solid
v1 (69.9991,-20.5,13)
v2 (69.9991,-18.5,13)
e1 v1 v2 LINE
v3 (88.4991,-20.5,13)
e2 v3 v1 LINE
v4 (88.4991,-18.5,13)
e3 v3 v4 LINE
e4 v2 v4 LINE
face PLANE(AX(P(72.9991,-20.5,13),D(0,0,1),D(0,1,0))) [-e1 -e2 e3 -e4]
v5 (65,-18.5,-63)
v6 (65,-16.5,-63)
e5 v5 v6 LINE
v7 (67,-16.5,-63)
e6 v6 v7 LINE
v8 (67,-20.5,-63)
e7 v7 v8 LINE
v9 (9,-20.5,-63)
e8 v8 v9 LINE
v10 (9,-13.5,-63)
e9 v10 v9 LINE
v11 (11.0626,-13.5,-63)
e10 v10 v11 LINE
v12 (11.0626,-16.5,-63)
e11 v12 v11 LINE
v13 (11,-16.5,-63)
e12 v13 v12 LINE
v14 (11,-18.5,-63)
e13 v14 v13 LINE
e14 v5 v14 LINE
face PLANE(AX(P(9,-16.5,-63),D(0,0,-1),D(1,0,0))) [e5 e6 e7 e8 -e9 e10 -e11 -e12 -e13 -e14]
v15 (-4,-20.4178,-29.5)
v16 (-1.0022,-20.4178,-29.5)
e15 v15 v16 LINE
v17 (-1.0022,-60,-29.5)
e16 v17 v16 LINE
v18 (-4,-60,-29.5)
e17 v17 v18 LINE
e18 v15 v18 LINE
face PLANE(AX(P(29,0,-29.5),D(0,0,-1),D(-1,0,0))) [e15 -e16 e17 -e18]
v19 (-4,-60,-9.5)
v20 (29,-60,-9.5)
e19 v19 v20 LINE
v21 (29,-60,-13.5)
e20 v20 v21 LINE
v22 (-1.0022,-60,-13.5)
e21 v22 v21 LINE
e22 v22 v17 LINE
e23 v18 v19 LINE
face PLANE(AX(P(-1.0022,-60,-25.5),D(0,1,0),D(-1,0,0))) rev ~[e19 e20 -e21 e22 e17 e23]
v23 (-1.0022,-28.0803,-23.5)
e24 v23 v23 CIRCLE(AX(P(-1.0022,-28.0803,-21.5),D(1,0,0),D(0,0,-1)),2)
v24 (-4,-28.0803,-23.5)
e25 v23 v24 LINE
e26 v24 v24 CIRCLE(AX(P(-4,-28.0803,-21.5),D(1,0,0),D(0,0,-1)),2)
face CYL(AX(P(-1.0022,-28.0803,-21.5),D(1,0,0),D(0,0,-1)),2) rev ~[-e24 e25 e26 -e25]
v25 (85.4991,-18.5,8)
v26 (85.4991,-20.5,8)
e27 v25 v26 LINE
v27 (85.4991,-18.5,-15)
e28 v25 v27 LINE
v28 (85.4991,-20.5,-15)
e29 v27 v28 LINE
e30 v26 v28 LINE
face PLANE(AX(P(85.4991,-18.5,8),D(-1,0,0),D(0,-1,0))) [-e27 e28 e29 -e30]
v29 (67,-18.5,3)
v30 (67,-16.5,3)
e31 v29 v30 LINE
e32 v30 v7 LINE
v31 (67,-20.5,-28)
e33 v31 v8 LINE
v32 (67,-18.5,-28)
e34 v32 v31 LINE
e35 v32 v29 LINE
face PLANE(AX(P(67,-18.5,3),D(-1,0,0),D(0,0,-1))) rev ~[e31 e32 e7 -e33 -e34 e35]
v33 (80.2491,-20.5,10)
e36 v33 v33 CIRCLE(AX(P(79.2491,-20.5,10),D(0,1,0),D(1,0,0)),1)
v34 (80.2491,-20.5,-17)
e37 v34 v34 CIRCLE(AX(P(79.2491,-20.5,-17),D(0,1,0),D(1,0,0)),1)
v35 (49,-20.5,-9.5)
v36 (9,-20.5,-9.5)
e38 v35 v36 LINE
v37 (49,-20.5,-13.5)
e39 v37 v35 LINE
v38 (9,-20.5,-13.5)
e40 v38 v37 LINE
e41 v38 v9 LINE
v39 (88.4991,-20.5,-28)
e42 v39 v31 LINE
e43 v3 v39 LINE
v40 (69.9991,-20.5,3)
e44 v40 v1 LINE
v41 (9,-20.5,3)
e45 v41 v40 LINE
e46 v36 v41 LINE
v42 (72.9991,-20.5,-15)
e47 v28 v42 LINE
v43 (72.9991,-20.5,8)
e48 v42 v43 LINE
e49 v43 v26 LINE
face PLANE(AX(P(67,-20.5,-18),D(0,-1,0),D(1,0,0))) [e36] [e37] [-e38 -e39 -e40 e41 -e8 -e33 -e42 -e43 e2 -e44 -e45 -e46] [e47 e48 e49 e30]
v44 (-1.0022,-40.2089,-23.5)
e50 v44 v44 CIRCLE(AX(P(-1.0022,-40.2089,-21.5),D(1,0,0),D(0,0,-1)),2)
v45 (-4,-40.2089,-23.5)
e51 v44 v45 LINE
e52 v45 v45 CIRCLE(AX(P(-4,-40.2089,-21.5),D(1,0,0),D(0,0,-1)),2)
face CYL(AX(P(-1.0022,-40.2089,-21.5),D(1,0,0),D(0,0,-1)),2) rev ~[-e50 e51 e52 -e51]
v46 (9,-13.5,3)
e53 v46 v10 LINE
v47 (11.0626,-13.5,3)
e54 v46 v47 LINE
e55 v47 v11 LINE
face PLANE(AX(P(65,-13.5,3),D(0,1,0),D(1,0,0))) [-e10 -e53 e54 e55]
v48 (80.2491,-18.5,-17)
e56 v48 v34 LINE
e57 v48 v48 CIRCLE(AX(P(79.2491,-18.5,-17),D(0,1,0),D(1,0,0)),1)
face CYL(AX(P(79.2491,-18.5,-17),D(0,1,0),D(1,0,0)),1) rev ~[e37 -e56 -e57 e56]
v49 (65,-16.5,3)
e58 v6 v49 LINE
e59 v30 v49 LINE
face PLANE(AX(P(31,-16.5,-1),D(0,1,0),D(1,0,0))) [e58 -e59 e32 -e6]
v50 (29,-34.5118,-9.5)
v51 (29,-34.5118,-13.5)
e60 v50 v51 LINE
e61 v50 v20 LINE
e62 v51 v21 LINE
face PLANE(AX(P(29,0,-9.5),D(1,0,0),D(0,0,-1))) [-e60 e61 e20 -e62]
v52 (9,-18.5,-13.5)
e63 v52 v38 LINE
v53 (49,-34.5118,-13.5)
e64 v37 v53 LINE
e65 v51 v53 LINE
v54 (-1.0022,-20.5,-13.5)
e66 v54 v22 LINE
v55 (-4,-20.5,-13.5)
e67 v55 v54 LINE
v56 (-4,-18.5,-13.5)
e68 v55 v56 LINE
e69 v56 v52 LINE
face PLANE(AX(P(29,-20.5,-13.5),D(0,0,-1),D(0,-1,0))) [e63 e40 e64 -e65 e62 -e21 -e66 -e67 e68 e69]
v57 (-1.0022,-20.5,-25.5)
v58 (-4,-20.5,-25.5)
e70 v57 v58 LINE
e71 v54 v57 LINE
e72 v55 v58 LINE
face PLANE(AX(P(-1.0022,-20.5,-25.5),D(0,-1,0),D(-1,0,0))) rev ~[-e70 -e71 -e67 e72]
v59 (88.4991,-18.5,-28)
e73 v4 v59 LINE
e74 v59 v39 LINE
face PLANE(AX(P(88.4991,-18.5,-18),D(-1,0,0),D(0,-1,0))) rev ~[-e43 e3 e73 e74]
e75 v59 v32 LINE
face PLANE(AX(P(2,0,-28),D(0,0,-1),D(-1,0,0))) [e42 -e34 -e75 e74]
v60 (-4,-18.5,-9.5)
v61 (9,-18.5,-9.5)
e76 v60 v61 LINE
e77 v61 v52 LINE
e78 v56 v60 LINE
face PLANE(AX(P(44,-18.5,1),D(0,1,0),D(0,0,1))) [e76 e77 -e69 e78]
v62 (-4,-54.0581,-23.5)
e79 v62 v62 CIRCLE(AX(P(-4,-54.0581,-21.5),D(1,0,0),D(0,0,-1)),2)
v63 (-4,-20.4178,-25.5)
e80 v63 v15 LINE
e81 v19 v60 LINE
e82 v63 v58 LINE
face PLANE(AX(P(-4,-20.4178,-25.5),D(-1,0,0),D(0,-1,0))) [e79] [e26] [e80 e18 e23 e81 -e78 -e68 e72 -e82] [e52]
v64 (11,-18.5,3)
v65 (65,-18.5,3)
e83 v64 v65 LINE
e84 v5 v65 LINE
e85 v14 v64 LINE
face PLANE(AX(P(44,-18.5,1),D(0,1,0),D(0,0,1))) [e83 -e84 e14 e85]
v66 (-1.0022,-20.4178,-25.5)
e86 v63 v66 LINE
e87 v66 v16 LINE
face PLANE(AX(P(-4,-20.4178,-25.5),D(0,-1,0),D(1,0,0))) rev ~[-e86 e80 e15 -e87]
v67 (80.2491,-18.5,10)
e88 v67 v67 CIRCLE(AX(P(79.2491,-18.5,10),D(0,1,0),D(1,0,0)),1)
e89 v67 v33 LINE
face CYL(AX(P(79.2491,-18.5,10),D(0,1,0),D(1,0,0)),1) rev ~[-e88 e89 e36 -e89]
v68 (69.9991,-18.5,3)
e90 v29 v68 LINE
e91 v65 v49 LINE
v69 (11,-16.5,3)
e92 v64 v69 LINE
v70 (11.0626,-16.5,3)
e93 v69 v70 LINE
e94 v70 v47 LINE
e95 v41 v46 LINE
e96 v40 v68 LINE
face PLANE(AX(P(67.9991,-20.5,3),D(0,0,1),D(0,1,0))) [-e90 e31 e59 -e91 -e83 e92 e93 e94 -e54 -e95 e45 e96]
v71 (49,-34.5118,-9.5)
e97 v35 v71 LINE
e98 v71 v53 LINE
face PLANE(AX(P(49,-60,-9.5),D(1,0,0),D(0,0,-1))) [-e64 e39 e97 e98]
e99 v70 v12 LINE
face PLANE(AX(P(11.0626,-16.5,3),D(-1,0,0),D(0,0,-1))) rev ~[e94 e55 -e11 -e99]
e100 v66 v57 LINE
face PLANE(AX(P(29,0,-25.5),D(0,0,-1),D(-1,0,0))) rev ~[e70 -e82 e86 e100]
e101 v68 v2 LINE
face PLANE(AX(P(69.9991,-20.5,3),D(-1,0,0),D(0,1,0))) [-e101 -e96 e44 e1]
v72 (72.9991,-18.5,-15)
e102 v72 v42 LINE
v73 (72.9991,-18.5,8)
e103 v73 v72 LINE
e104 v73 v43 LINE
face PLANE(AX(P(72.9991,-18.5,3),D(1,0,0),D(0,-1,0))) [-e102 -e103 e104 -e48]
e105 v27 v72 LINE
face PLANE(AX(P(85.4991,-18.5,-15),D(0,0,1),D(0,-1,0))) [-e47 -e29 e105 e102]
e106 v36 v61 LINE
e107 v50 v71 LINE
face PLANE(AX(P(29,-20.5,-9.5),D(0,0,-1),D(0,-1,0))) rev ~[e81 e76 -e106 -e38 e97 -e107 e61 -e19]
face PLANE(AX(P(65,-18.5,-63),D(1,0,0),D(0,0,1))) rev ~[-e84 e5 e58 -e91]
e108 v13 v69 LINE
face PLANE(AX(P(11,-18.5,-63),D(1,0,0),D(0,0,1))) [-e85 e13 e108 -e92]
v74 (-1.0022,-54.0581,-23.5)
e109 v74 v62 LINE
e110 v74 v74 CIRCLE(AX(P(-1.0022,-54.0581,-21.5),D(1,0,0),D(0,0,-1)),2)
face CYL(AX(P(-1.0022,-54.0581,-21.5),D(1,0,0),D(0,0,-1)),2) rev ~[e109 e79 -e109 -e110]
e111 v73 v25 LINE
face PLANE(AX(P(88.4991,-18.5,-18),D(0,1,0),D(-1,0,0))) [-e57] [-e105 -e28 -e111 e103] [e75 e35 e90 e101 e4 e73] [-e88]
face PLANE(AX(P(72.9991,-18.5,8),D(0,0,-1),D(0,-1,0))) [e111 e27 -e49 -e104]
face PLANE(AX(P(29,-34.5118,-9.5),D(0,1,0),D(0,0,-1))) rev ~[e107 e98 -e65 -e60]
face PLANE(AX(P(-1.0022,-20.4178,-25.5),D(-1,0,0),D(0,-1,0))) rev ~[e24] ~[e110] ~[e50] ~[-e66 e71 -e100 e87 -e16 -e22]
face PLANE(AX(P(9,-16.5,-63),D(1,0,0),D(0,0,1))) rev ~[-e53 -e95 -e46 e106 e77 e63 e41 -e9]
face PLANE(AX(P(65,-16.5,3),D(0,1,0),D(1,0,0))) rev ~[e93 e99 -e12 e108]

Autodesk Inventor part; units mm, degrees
ref_plane "YZ Plane" through (0, 0, 0) normal (1, 0, 0) x (0, 1, 0)
ref_plane "XZ Plane" through (0, 0, 0) normal (0, 1, 0) x (-1, 0, 0)
ref_plane "XY Plane" through (0, 0, 0) normal (0, 0, 1) x (1, 0, 0)
sketch "Sketch1" plane through (0, 0, 0) normal (1, 0, 0) x (0, 1, 0)
  line L0 (0, 0) -> (20.5296, 0)
  line L1 (20.5296, -23) -> (0, -23)
  line L2 (0, -23) -> (0, 0)
  line L3 (0, 0) -> (50, 0)
  line L4 (50, 0) -> (50, -23)
  line L5 (50, -23) -> (0, -23)
  line L6 (0, -23) -> (0, 0)
  dimension "d0" = 23
  dimension "d1" = 50
extrude "Extrusion1" add sketch "Sketch1" along normal blind 2
sketch "Sketch2" plane through (2, 0, 0) normal (1, 0, 0) x (0, 0, -1)
  line L0 (23, 50) -> (0, 50) projected
  line L1 (13.5, 0) -> (9.5, 0)
  line L2 (9.5, 0) -> (9.5, 50)
  line L3 (9.5, 50) -> (13.5, 50)
  line L4 (13.5, 50) -> (13.5, 0)
  line L5 (13.5, 0) -> (9.5, 50) construction
  line L6 (9.5, 0) -> (13.5, 50) construction
  point P0 (0, 0)
  point P1 (17.2504, 25)
  point P2 (11.5, 25)
  dimension "d4" = 4
sketch "Sketch3" plane through (0, 0, 0) normal (-1, 0, 0) x (0, 0, 1)
  line L0 (-23, 50) -> (0, 50) projected
  line L1 (-23, 50) -> (0, 50)
  line L2 (0, 50) -> (0, 0)
  line L3 (0, 0) -> (-23, 0)
  line L4 (-23, 0) -> (-23, 50)
extrude "Extrusion2" add sketch "Sketch3" along normal blind 1
sketch "Sketch4" plane through (2, 0, 0) normal (1, 0, 0) x (0, 0, -1)
  point P0 (0, 0)
extrude "Extrusion3" add sketch "Sketch2" along normal blind 29
sketch "Sketch5" plane through (2, 0, -9.5) normal (0, 0, 1) x (1, 0, 0)
  line L0 (0, 50) -> (29, 50) projected
  line L1 (29, 0) -> (27, 0)
  line L2 (27, 0) -> (27, 50)
  line L3 (27, 50) -> (29, 50)
  line L4 (29, 50) -> (29, 0)
  point P0 (-2, 0)
  dimension "d9" = 2
extrude "Extrusion4" add sketch "Sketch5" along normal blind 17.5
sketch "Sketch6" plane through (2, 0, -13.5) normal (0, 0, -1) x (-1, 0, 0)
  line L0 (-29, 50) -> (-27, 50) projected
  line L1 (-27, 50) -> (-27, 0) projected
  line L2 (-29, 50) -> (-27, 50)
  line L3 (-27, 50) -> (-27, 0)
  line L4 (-27, 0) -> (-29, 0)
  line L5 (-29, 0) -> (-29, 50)
  point P0 (2, 0)
extrude "Extrusion5" add sketch "Sketch6" along normal blind 17.5
sketch "Sketch7" plane through (31, 0, 0) normal (1, 0, 0) x (0, 0, -1)
  line L0 (-8, 0) -> (-8, 50) projected
  line L1 (31, 50) -> (31, 0) projected
  line L2 (-8, 50) -> (31, 50)
  line L3 (31, 50) -> (31, 48)
  line L4 (31, 48) -> (-8, 48)
  line L5 (-8, 48) -> (-8, 50)
  point P0 (0, 0)
  dimension "d14" = 2
extrude "Extrusion6" add sketch "Sketch7" along normal blind 32
sketch "Sketch8" plane through (31, 48, -31) normal (0, -1, 0) x (1, 0, 0)
  line L0 (32, 39) -> (32, 0) projected
  line L1 (0, 0) -> (32, 0) projected
  line L2 (32, 39) -> (30, 39)
  line L3 (30, 39) -> (30, 0)
  line L4 (30, 0) -> (32, 0)
  line L5 (32, 0) -> (32, 39)
  point P0 (-31, 31)
  dimension "d17" = 2
extrude "Extrusion7" add sketch "Sketch8" along normal up to surface (48 mm away)
sketch "Sketch9" plane through (31, 48, -31) normal (0, -1, 0) x (1, 0, 0)
  point P0 (-31, 31)
sketch "Sketch10" plane through (61, 0, 8) normal (0, -1, 0) x (1, 0, 0)
  line L0 (2, -39) -> (2, 0) projected
  line L1 (-32, -17.5) -> (-32, 0) projected
  line L2 (2, 0) -> (-32, 0)
  line L3 (-32, 0) -> (-32, -9)
  line L4 (-32, -9) -> (2, -9)
  line L5 (2, -9) -> (2, 0)
  point P0 (-61, -8)
  dimension "d20" = 9
extrude "Extrusion8" cut sketch "Sketch10" against normal blind 50
sketch "Sketch11" plane through (2, 0, -31) normal (0, 0, -1) x (-1, 0, 0)
  line L0 (-61, 50) -> (-61, 0) projected
  line L1 (0, 50) -> (-27, 50) projected
  line L2 (-61, 0) -> (-27, 0)
  line L3 (-27, 0) -> (-27, 50)
  line L4 (-27, 50) -> (-61, 50)
  line L5 (-61, 50) -> (-61, 0)
  point P0 (2, 0)
extrude "Extrusion9" add sketch "Sketch11" along normal blind 2
sketch "Sketch12" plane through (-1, 0, 0) normal (0, -1, 0) x (1, 0, 0)
  line L0 (62, -1) -> (32, -1) projected
  line L1 (64, -1) -> (64, -33) projected
  line L2 (62, -1) -> (64, -1)
  line L3 (64, -1) -> (64, -31.0308)
  line L4 (64, -31.0308) -> (62, -31.0308)
  line L5 (62, -31.0308) -> (62, -1)
  point P0 (1, 0)
extrude "Extrusion10" add sketch "Sketch12" along normal blind 20.5
sketch "Sketch13" plane through (61, 48, -31) normal (-1, 0, 0) x (0, 0, 1)
  line L0 (30, -68.5) -> (-0.0308, -68.5) projected
  line L1 (30, 0) -> (30, -68.5) projected
  line L2 (-0.0308, -68.5) -> (30, -68.5)
  line L3 (30, -68.5) -> (30, -66.5)
  line L4 (30, -66.5) -> (-0.0308, -66.5)
  line L5 (-0.0308, -66.5) -> (-0.0308, -68.5)
  point P0 (31, -48)
  dimension "d27" = 2
extrude "Extrusion11" add sketch "Sketch13" along normal up to surface (32 mm away)
sketch "Sketch14" plane through (-1, 0, 0) normal (0, -1, 0) x (1, 0, 0)
  line L0 (64, -33) -> (30, -33) projected
  line L1 (64, -31.0308) -> (30, -31.0308) projected
  line L2 (64, -33) -> (30, -33)
  line L3 (30, -33) -> (30, -31.0308)
  line L4 (30, -31.0308) -> (64, -31.0308)
  line L5 (64, -31.0308) -> (64, -33)
  point P0 (1, 0)
  point P1 (30, -33)
extrude "Extrusion12" add sketch "Sketch14" along normal up to surface (20.5 mm away)
sketch "Sketch15" plane through (61, 48, -31) normal (-1, 0, 0) x (0, 0, 1)
  line L0 (-0.0308, -66.5) -> (30, -66.5) projected
  line L1 (30, 0) -> (30, -66.5) projected
  line L2 (-0.0308, -66.5) -> (30, -66.5)
  line L3 (30, -66.5) -> (30, -48)
  line L4 (30, -48) -> (-0.0308, -48)
  line L5 (-0.0308, -48) -> (-0.0308, -66.5)
  point P0 (31, -48)
extrude "Extrusion13" cut sketch "Sketch15" against normal blind 10
sketch "Sketch16" plane through (-1, 0, 0) normal (0, -1, 0) x (1, 0, 0)
  line L0 (32, -31) -> (32, -1) projected
  line L1 (30, -33) -> (64, -33) projected
  line L2 (32, -1) -> (30, -1)
  line L3 (30, -1) -> (30, -33)
  line L4 (30, -33) -> (32, -33)
  line L5 (32, -33) -> (32, -1)
  point P0 (1, 0)
extrude "Extrusion14" add sketch "Sketch16" along normal up to surface (18.5 mm away)
sketch "Sketch17" plane through (31, 0, -31.0308) normal (0, 0, 1) x (1, 0, 0)
  line L0 (0, 48) -> (0, -18.5) projected
  line L1 (32, 50) -> (32, -20.5) projected
  line L2 (0, -18.5) -> (32, -18.5)
  line L3 (32, -18.5) -> (32, 0)
  line L4 (32, 0) -> (0, 0)
  line L5 (0, 0) -> (0, -18.5)
  point P0 (-31, 0)
extrude "Extrusion15" cut sketch "Sketch17" against normal blind 10
sketch "Sketch18" plane through (31, 0, 0) normal (1, 0, 0) x (0, 0, -1)
  line L0 (1, 48) -> (1, -18.5) projected
  line L1 (31, 0) -> (1, 0) projected
  line L2 (1, -18.5) -> (3, -18.5)
  line L3 (3, -18.5) -> (3, 0)
  line L4 (3, 0) -> (1, 0)
  line L5 (1, 0) -> (1, -18.5)
  point P0 (0, 0)
  dimension "d38" = 2
extrude "Extrusion16" add sketch "Sketch18" along normal blind 13
sketch "Sketch19" plane through (29, 50, -1) normal (0, 0, 1) x (1, 0, 0)
  line L0 (34, -68.5) -> (34, -70.5) projected
  line L1 (34, -70.5) -> (0, -70.5) projected
  line L2 (34, -68.5) -> (0, -68.5)
  line L3 (0, -68.5) -> (0, -70.5)
  line L4 (0, -70.5) -> (34, -70.5)
  line L5 (34, -70.5) -> (34, -68.5)
  point P0 (-29, -50)
extrude "Extrusion17" add sketch "Sketch19" along normal blind 2
sketch "Sketch20" plane through (31, -18.5, -33) normal (0, 1, 0) x (1, 0, 0)
  point P0 (-31, -33)
sketch "Sketch21" plane through (29, 50, -1) normal (0, 0, 1) x (1, 0, 0)
  line L0 (15, -50) -> (15, -68.5) projected
  line L1 (2, -68.5) -> (15, -68.5) projected
  line L2 (15, -50) -> (2, -50)
  line L3 (2, -50) -> (2, -68.5)
  line L4 (2, -68.5) -> (15, -68.5)
  line L5 (15, -68.5) -> (15, -50)
  point P0 (-29, -50)
extrude "Extrusion18" cut sketch "Sketch21" against normal blind 2
sketch "Sketch22" plane through (31, -18.5, -33) normal (0, 1, 0) x (1, 0, 0)
  line L0 (32, -34) -> (-2, -34) projected
  line L1 (30, -32) -> (0, -32) projected
  line L2 (-2, -34) -> (13, -34)
  line L3 (13, -34) -> (13, -32)
  line L4 (13, -32) -> (-2, -32)
  line L5 (-2, -32) -> (-2, -34)
  point P0 (-31, -33)
  dimension "d45" = 15
extrude "Extrusion19" add sketch "Sketch22" along normal blind 4
sketch "Sketch23" plane through (29, 50, 1) normal (0, 0, 1) x (1, 0, 0)
  point P0 (-29, -50)
sketch "Sketch24" plane through (63, 0, 0) normal (1, 0, 0) x (0, 0, -1)
  point P0 (0, 0)
sketch "Sketch25" plane through (63, 0, 0) normal (1, 0, 0) x (0, 0, -1)
  line L0 (-1, -20.5) -> (-1, -18.5) projected
  line L1 (33, -20.5) -> (-1, -20.5) projected
  line L2 (-1, -18.5) -> (33, -18.5)
  line L3 (33, -18.5) -> (33, -20.5)
  line L4 (33, -20.5) -> (-1, -20.5)
  line L5 (-1, -20.5) -> (-1, -18.5)
  point P0 (0, 0)
extrude "Extrusion20" add sketch "Sketch25" along normal blind 5
sketch "Sketch26" plane through (68, 0, 0) normal (1, 0, 0) x (0, 0, -1)
  line L0 (1, -18.5) -> (33, -18.5) projected
  line L1 (33, -20.5) -> (-1, -20.5) projected
  line L2 (2.0812, -18.5) -> (-1, -18.5)
  line L3 (-1, -18.5) -> (-1, -20.5)
  line L4 (-1, -20.5) -> (2.0812, -20.5)
  line L5 (2.0812, -20.5) -> (2.0812, -18.5)
  point P0 (0, 0)
extrude "Extrusion21" add sketch "Sketch26" along normal blind 14
sketch "Sketch27" plane through (68, -20.5, -2.0812) normal (0, 0, -1) x (-1, 0, 0)
  line L0 (-14, 2) -> (-14, 0) projected
  line L1 (39, 0) -> (-14, 0) projected
  line L2 (-14, 2) -> (-12, 2)
  line L3 (-12, 2) -> (-12, 0)
  line L4 (-12, 0) -> (-14, 0)
  line L5 (-14, 0) -> (-14, 2)
  point P0 (68, 20.5)
  dimension "d52" = 2
extrude "Extrusion22" add sketch "Sketch27" along normal blind 25
sketch "Sketch28" plane through (80, -20.5, -2.0812) normal (-1, 0, 0) x (0, 0, 1)
  point P0 (2.0812, 20.5)
sketch "Sketch29" plane through (80, -20.5, -2.0812) normal (-1, 0, 0) x (0, 0, 1)
  line L0 (-25, 2) -> (-25, 0) projected
  line L1 (3.0812, 0) -> (-25, 0) projected
  line L2 (-25, 2) -> (-23, 2)
  line L3 (-23, 2) -> (-23, 0)
  line L4 (-23, 0) -> (-25, 0)
  line L5 (-25, 0) -> (-25, 2)
  point P0 (2.0812, 20.5)
  dimension "d55" = 2
extrude "Extrusion23" add sketch "Sketch29" along normal up to surface (12 mm away)
sketch "Sketch30" plane through (68, -20.5, -27.0812) normal (0, 0, -1) x (-1, 0, 0)
  line L0 (-14, 2) -> (-14, 0) projected
  line L1 (0, 0) -> (-12, 0) projected
  line L2 (-14, 2) -> (0, 2)
  line L3 (0, 2) -> (0, 0)
  line L4 (0, 0) -> (-14, 0)
  line L5 (-14, 0) -> (-14, 2)
  point P0 (68, 20.5)
extrude "Extrusion24" add sketch "Sketch30" along normal up to surface (5.9188 mm away)
sketch "Sketch31" plane through (31, -18.5, -1) normal (0, 1, 0) x (1, 0, 0)
  line L0 (37, 1.0812) -> (49, 1.0812) projected
  line L1 (43, 1.0812) -> (43, 0.2954)
  point P0 (-31, -1)
sketch "Sketch32" plane through (29, 50, 1) normal (0, 0, 1) x (1, 0, 0)
  line L0 (53, -68.5) -> (53, -70.5) projected
  line L1 (15, -68.5) -> (53, -68.5) projected
  line L2 (53, -70.5) -> (15, -70.5)
  line L3 (15, -70.5) -> (15, -68.5)
  line L4 (15, -68.5) -> (53, -68.5)
  line L5 (53, -68.5) -> (53, -70.5)
  point P0 (-29, -50)
extrude "Extrusion25" add sketch "Sketch32" along normal blind 2
sketch "Sketch33" plane through (31, -18.5, -1) normal (0, 1, 0) x (1, 0, 0)
  line L0 (37, 1.0812) -> (49, 1.0812) projected
  circle A0 centre (43, -0.9188) radius 1
  line L1 (49, 24.0812) -> (37, 24.0812) projected
  circle A1 centre (43, 26.0812) radius 1
  point P0 (-31, -1)
  dimension "d63" = 2
extrude "Extrusion26" cut sketch "Sketch33" against normal blind 5
thread "Thread1" size "M2x0.4" class "6H" standard "ANSI Metric M Profile" full length
thread "Thread2" size "M2x0.4" class "6H" standard "ANSI Metric M Profile" full length
sketch "Sketch34" plane through (2, 0, -33) normal (0, 0, -1) x (-1, 0, 0)
  line L0 (-27, 50) -> (-27, -20.5) projected
  line L1 (-80, -18.5) -> (-42, -18.5) projected
  line L2 (-27, -20.5) -> (-61, -20.5)
  line L3 (-61, -20.5) -> (-61, -18.5)
  line L4 (-61, -18.5) -> (-27, -18.5)
  line L5 (-27, -18.5) -> (-27, -20.5)
  point P0 (2, 0)
  point P1 (-42, -18.5)
extrude "Extrusion27" add sketch "Sketch34" along normal blind 30
sketch "Sketch35" plane through (31, -18.5, -1) normal (0, 1, 0) x (1, 0, 0)
  line L0 (0, 0) -> (0, 32) projected
  line L1 (-2, 62) -> (-2, -2) projected
  line L2 (0, 32) -> (-2, 32)
  line L3 (-2, 32) -> (-2, 62)
  line L4 (-2, 62) -> (0, 62)
  line L5 (0, 62) -> (0, 32)
  point P0 (-31, -1)
extrude "Extrusion28" add sketch "Sketch35" along normal blind 2
sketch "Sketch36" plane through (63, -20.5, -33) normal (1, 0, 0) x (0, 0, -1)
  line L0 (0, 0) -> (0, 2) projected
  line L1 (0, 2) -> (30, 2)
  line L2 (30, 2) -> (30, 0)
  line L3 (30, 0) -> (0, 0)
  line L4 (0, 0) -> (0, 2)
  point P0 (-33, 20.5)
extrude "Extrusion29" add sketch "Sketch36" along normal blind 4
sketch "Sketch37" plane through (31, -18.5, -1) normal (0, 1, 0) x (1, 0, 0)
  line L0 (0, 62) -> (36, 62) projected
  line L1 (51, -4) -> (13, -4) projected
  line L2 (36, 62) -> (34, 62)
  line L3 (34, 62) -> (34, -4)
  line L4 (34, -4) -> (36, -4)
  line L5 (36, -4) -> (36, 62)
  point P0 (-31, -1)
  dimension "d77" = 2
extrude "Extrusion30" add sketch "Sketch37" along normal blind 2
sketch "Sketch38" plane through (29, 50, -1) normal (0, 0, 1) x (1, 0, 0)
  line L0 (2, -2) -> (2, -64.5) projected
  line L1 (0, 0) -> (0, -66.5) projected
  line L2 (2, -2) -> (0, -2)
  line L3 (0, -2) -> (0, -20)
  line L4 (0, -20) -> (2, -20)
  line L5 (2, -20) -> (2, -2)
  line L6 (34, -50) -> (2, -50) projected
  line L7 (0, -20) -> (34, -20)
  line L8 (34, -20) -> (34, -50)
  line L9 (34, -50) -> (0, -50)
  line L10 (0, -50) -> (0, -20)
  point P0 (-29, -50)
  dimension "d80" = 18
extrude "Extrusion31" add sketch "Sketch38" along normal blind 2 contours L7 L8 L6 L0
sketch "Sketch39" plane through (29, 50, -1) normal (0, 0, 1) x (1, 0, 0)
  line L0 (-27, -50) -> (0, -50) projected
  line L1 (2, -20) -> (2, -50) projected
  line L2 (0, -50) -> (2, -50)
  line L3 (2, -50) -> (2, -20)
  line L4 (2, -20) -> (0, -20)
  line L5 (0, -20) -> (0, -50)
  point P0 (-29, -50)
extrude "Extrusion32" add sketch "Sketch39" along normal blind 2
sketch "Sketch40" plane through (29, 50, 1) normal (0, 0, 1) x (1, 0, 0)
  line L0 (34, -50) -> (34, -20) projected
  line L1 (0, -20) -> (34, -20)
  line L2 (34, -20) -> (34, -20.389)
  line L3 (34, -20.389) -> (0, -20.389)
  line L4 (0, -20.389) -> (0, -20)
  point P0 (-29, -50)
  dimension "d85" = 0.389
extrude "Extrusion33" cut sketch "Sketch40" against normal blind 2
sketch "Sketch41" plane through (29, 50, 1) normal (0, 0, 1) x (1, 0, 0)
  point P0 (-29, -50)
sketch "Sketch42" plane through (29, 50, -1) normal (0, 0, 1) x (1, 0, 0)
  line L0 (32, -2) -> (32, -20.389) projected
  line L1 (32, -2) -> (38, -2)
  point P0 (-29, -50)
  dimension "d88" = 6
sketch "Sketch43" plane through (63, 0, 0) normal (1, 0, 0) x (0, 0, -1)
  line L0 (9.5, 50) -> (1, 50) projected
  line L1 (31, 48) -> (1, 48) projected
  line L2 (1, 50) -> (31, 50)
  line L3 (31, 50) -> (31, 48)
  line L4 (31, 48) -> (1, 48)
  line L5 (1, 48) -> (1, 50)
  point P0 (0, 0)
  point P1 (1, 48)
extrude "Extrusion34" add sketch "Sketch43" along normal blind 6
sketch "Sketch44" plane through (63, 0, 0) normal (1, 0, 0) x (0, 0, -1)
  line L0 (33, 50) -> (33, 0) projected
  line L1 (31, 0) -> (33, 0) projected
  line L2 (33, 50) -> (31, 50)
  line L3 (31, 50) -> (31, 0)
  line L4 (31, 0) -> (33, 0)
  line L5 (33, 0) -> (33, 50)
  point P0 (0, 0)
extrude "Extrusion35" add sketch "Sketch44" along normal blind 6
sketch "Sketch45" plane through (63, 0, 0) normal (1, 0, 0) x (0, 0, -1)
  point P0 (0, 0)
sketch "Sketch46" plane through (63, 0, 0) normal (1, 0, 0) x (0, 0, -1)
  line L0 (-1, 0) -> (-1, 29.611) projected
  line L1 (31, 0) -> (31, 48) projected
  line L2 (-1, 0) -> (31, 0)
  line L3 (31, 0) -> (31, 2)
  line L4 (31, 2) -> (-1, 2)
  line L5 (-1, 2) -> (-1, 0)
  point P0 (0, 0)
  point P1 (-1, 2)
  dimension "d93" = 2
extrude "Extrusion36" add sketch "Sketch46" along normal blind 6
sketch "Sketch47" plane through (63, 48, -31) normal (0, 0, 1) x (1, 0, 0)
  line L0 (0, 0) -> (6, 0) projected
  line L1 (0, -46) -> (6, -46) projected
  line L2 (6, 0) -> (4, 0)
  line L3 (4, 0) -> (4, -46)
  line L4 (4, -46) -> (6, -46)
  line L5 (6, -46) -> (6, 0)
  point P0 (-63, -48)
  point P1 (4, 0)
  dimension "d96" = 2
sketch "Sketch48" plane through (63, 0, 0) normal (1, 0, 0) x (0, 0, -1)
  line L0 (31, 48) -> (1, 48) projected
  line L1 (1, 48) -> (31, 48)
  line L2 (31, 48) -> (31, 2)
  line L3 (31, 2) -> (1, 2)
  line L4 (1, 2) -> (1, 48)
  point P0 (0, 0)
extrude "Extrusion37" cut sketch "Sketch48" against normal blind 10
extrude "Extrusion38" add sketch "Sketch47" along normal up to surface (30 mm away)
sketch "Sketch49" plane through (63, 0, 0) normal (1, 0, 0) x (0, 0, -1)
  line L0 (1, 2) -> (1, 0) projected
  line L1 (-1, 29.611) -> (1, 29.611)
  line L2 (1, 29.611) -> (1, 2)
  line L3 (1, 2) -> (-1, 2)
  line L4 (-1, 2) -> (-1, 29.611)
  point P0 (0, 0)
extrude "Extrusion39" add sketch "Sketch49" along normal up to surface (6 mm away)
sketch "Sketch50" plane through (31, 0, -31) normal (0, -1, 0) x (1, 0, 0)
  line L0 (0, 30) -> (30, 30) projected
  line L1 (36, 30) -> (36, 0) projected
  line L2 (30, 30) -> (36, 30)
  line L3 (36, 30) -> (36, 0)
  line L4 (36, 0) -> (30, 0)
  line L5 (30, 0) -> (30, 30)
  point P0 (-31, 31)
extrude "Extrusion40" cut sketch "Sketch50" against normal blind 10
sketch "Sketch51" plane through (-1, 0, 0) normal (-1, 0, 0) x (0, 0, 1)
  line L0 (-23, 0) -> (-23, 50) projected
  line L1 (-23, 0) -> (0, 0)
  line L2 (0, 0) -> (0, 50)
  line L3 (0, 50) -> (-23, 50)
  line L4 (-23, 50) -> (-23, 0)
extrude "Extrusion41" cut sketch "Sketch51" against normal blind 3
sketch "Sketch52" plane through (29, 0, -9.5) normal (0, 0, 1) x (1, 0, 0)
  point P0 (-29, 0)
sketch "Sketch53" plane through (2, 0, 0) normal (-1, 0, 0) x (0, 0, 1)
  line L0 (-13.5, 50) -> (-13.5, 0) projected
  line L1 (-9.5, 0) -> (-9.5, 50) projected
  line L2 (-13.5, 50) -> (-9.5, 50)
  line L3 (-9.5, 50) -> (-9.5, 0)
  line L4 (-9.5, 0) -> (-13.5, 0)
  line L5 (-13.5, 0) -> (-13.5, 50)
  point P0 (0, 0)
extrude "Extrusion42" add sketch "Sketch53" along normal blind 6
sketch "Sketch54" plane through (29, 0, -9.5) normal (0, 0, 1) x (1, 0, 0)
  line L0 (0, 50) -> (-33, 50) projected
  line L1 (-33, 0) -> (0, 0) projected
  line L2 (-33, 50) -> (-30, 50)
  line L3 (-30, 50) -> (-30, 0)
  line L4 (-30, 0) -> (-33, 0)
  line L5 (-33, 0) -> (-33, 50)
  point P0 (-29, 0)
  dimension "d109" = 3
sketch "Sketch55" plane through (29, 0, -13.5) normal (0, 0, -1) x (-1, 0, 0)
  line L0 (33, 50) -> (33, 0) projected
  line L1 (33, 0) -> (0, 0) projected
  line L2 (33, 50) -> (30, 50)
  line L3 (30, 50) -> (30, 0)
  line L4 (30, 0) -> (33, 0)
  line L5 (33, 0) -> (33, 50)
  point P0 (29, 0)
  dimension "d110" = 3
extrude "Extrusion43" add sketch "Sketch55" along normal blind 12
sketch "Sketch56" plane through (29, 0, -13.5) normal (0, -1, 0) x (1, 0, 0)
  line L0 (-33, 4) -> (-33, -12) projected
  line L1 (0, 4) -> (-33, 4) projected
  line L2 (-33, -12) -> (-30.0022, -12)
  line L3 (-30.0022, -12) -> (-30.0022, 4)
  line L4 (-30.0022, 4) -> (-33, 4)
  line L5 (-33, 4) -> (-33, -12)
  line L6 (-30, 0) -> (0, 0) projected
  line L7 (-30.0022, 4) -> (0, 4)
  line L8 (0, 4) -> (0, 0)
  line L9 (0, 0) -> (-30.0022, 0)
  line L10 (-30.0022, 0) -> (-30.0022, 4)
  point P0 (-29, 13.5)
extrude "Extrusion44" add sketch "Sketch56" along normal blind 60
sketch "Sketch57" plane through (29, 50, 1) normal (0, 0, 1) x (1, 0, 0)
  point P0 (-29, -50)
sketch "Sketch58" plane through (-4, 0, 0) normal (-1, 0, 0) x (0, 0, 1)
  point P0 (0, 0)
sketch "Sketch59" plane through (-4, 0, 0) normal (-1, 0, 0) x (0, 0, 1)
  point P0 (0, 0)
extrude "Extrusion45" cut sketch "Sketch54" against normal blind 50
sketch "Sketch60" plane through (-1, 0, -9.5) normal (-1, 0, 0) x (0, 0, 1)
  line L0 (-4, 0) -> (-4, 50) projected
  line L1 (0, 0) -> (0, -60) projected
  line L2 (-4, 50) -> (0, 50)
  line L3 (0, 50) -> (0, 0)
  line L4 (0, 0) -> (-4, 0)
  line L5 (-4, 0) -> (-4, 50)
  point P0 (9.5, 0)
extrude "Extrusion46" cut sketch "Sketch60" against normal up to surface (30 mm away)
sketch "Sketch61" plane through (29, -60, -9.5) normal (1, 0, 0) x (0, 0, -1)
  point P0 (-9.5, 60)
sketch "Sketch62" plane through (-4, 0, 0) normal (-1, 0, 0) x (0, 0, 1)
  line L0 (-63, -20.5) -> (-13.5, -20.5) projected
  line L1 (-13.5, 0) -> (-25.5, 0) projected
  line L2 (-25.4638, -20.5) -> (-13.5, -20.5)
  line L3 (-13.5, -20.5) -> (-13.5, 0)
  line L4 (-13.5, 0) -> (-25.4638, 0)
  line L5 (-25.4638, 0) -> (-25.4638, -20.5)
  point P0 (0, 0)
  point P1 (-13.5, -20.5)
extrude "Extrusion47" cut sketch "Sketch62" against normal blind 10
sketch "Sketch63" plane through (29, 0, -25.5) normal (0, 0, -1) x (-1, 0, 0)
  line L0 (33, 0) -> (30.0022, 0) projected
  line L1 (30.0022, 0) -> (30.0022, -20.5) projected
  line L2 (33, 0) -> (30.0022, 0)
  line L3 (30.0022, 0) -> (30.0022, -20.5)
  line L4 (30.0022, -20.5) -> (33, -20.5)
  line L5 (33, -20.5) -> (33, 0)
  point P0 (29, 0)
extrude "Extrusion48" cut sketch "Sketch63" against normal blind 2
sketch "Sketch64" plane through (29, 0, -25.5) normal (0, 0, -1) x (-1, 0, 0)
  line L0 (30.0022, -20.5) -> (30.0022, -60) projected
  line L1 (33, 0) -> (33, -60) projected
  line L2 (30.0022, -60) -> (33, -60)
  line L3 (33, -60) -> (33, -20.4178)
  line L4 (33, -20.4178) -> (30.0022, -20.4178)
  line L5 (30.0022, -20.4178) -> (30.0022, -60)
  point P0 (29, 0)
extrude "Extrusion49" add sketch "Sketch64" along normal blind 4
sketch "Sketch65" plane through (-1.0022, -60, -13.5) normal (1, 0, 0) x (0, 0, -1)
  point P0 (-13.5, 60)
sketch "Sketch66" plane through (-1.0022, -60, -13.5) normal (1, 0, 0) x (0, 0, -1)
  line L0 (16, 0) -> (16, 39.5822) projected
  line L1 (16, 19.7911) -> (8, 19.7911)
  circle A0 centre (8, 19.7911) radius 2
  circle A1 centre (8, 31.9197) radius 2
  circle A2 centre (8, 5.9419) radius 2
  point P0 (-13.5, 60)
  dimension "d125" = 8
  dimension "d126" = 4
  dimension "d127" = 4
  dimension "d128" = 4
extrude "Extrusion50" cut sketch "Sketch66" against normal blind 4
sketch "Sketch67" plane through (69, 0, 0) normal (1, 0, 0) x (0, 0, -1)
  line L0 (1, 0) -> (-1, 0) projected
  line L1 (-1, 0) -> (33, 0)
  line L2 (33, 0) -> (33, 52.0409)
  line L3 (33, 52.0409) -> (-1, 52.0409)
  line L4 (-1, 52.0409) -> (-1, 0)
  point P0 (0, 0)
extrude "Extrusion51" cut sketch "Sketch67" against normal up to surface (40 mm away)
sketch "Sketch68" plane through (29, -60, -9.5) normal (1, 0, 0) x (0, 0, -1)
  line L0 (0, 60) -> (0, 0) projected
  line L1 (4, 39.5) -> (4, 0) projected
  line L2 (0, 25.4882) -> (4, 25.4882)
  line L3 (4, 25.4882) -> (4, 39.5)
  line L4 (4, 39.5) -> (0, 39.5)
  line L5 (0, 39.5) -> (0, 25.4882)
  point P0 (-9.5, 60)
extrude "Extrusion52" add sketch "Sketch68" along normal blind 20
sketch "Sketch69" plane through (44, -18.5, -1) normal (1, 0, 0) x (0, 0, -1)
  line L0 (-2, 4) -> (0, 4) projected
  line L1 (0, 0) -> (0, 4) projected
  line L2 (-2, 4) -> (0, 4)
  line L3 (0, 4) -> (0, 0)
  line L4 (0, 0) -> (-2, 0)
  line L5 (-2, 0) -> (-2, 4)
  point P0 (-1, 18.5)
extrude "Extrusion53" cut sketch "Sketch69" against normal blind 20
sketch "Sketch70" plane through (44, -20.5, 1) normal (-1, 0, 0) x (0, 0, 1)
  line L0 (0, 2) -> (-2, 2) projected
  line L1 (0, 2) -> (2, 2)
  line L2 (2, 2) -> (2, 0)
  line L3 (2, 0) -> (0, 0)
  line L4 (0, 0) -> (0, 2)
  point P0 (-1, 20.5)
extrude "Extrusion54" add sketch "Sketch70" along normal up to surface (15 mm away)
sketch "Sketch71" plane through (31, 0, 0) normal (1, 0, 0) x (0, 0, -1)
  line L0 (1, 0) -> (9.5, 0) projected
  line L1 (33, -20.5) -> (33, -18.5) projected
  line L2 (1, 0) -> (33, 0)
  line L3 (33, 0) -> (33, -18.5)
  line L4 (33, -18.5) -> (1, -18.5)
  line L5 (1, -18.5) -> (1, 0)
  point P0 (0, 0)
extrude "Extrusion55" cut sketch "Sketch71" against normal up to surface (35 mm away)
sketch "Sketch72" plane through (31, 0, 0) normal (1, 0, 0) x (0, 0, -1)
  line L0 (33, -16.5) -> (33, -18.5) projected
  line L1 (63, -20.5) -> (63, -16.5) projected
  line L2 (33, -16.5) -> (63, -16.5)
  line L3 (63, -16.5) -> (63, -18.5)
  line L4 (63, -18.5) -> (33, -18.5)
  line L5 (33, -18.5) -> (33, -16.5)
  point P0 (0, 0)
extrude "Extrusion56" cut sketch "Sketch72" against normal blind 10
sketch "Sketch73" plane through (29, -20.5, -13.5) normal (-1, 0, 0) x (0, 0, 1)
  point P0 (13.5, 20.5)
sketch "Sketch74" plane through (29, -20.5, -13.5) normal (-1, 0, 0) x (0, 0, 1)
  line L0 (16.5, 2) -> (-49.5, 2) projected
  line L1 (4, 0) -> (0, 0) projected
  line L2 (-49.5, 2) -> (0, 2)
  line L3 (0, 2) -> (0, 0)
  line L4 (0, 0) -> (-49.5, 0)
  line L5 (-49.5, 0) -> (-49.5, 2)
  line L6 (16.5, 2) -> (4, 2) projected
  line L7 (4, 0) -> (16.5, 0) projected
  line L8 (4, 2) -> (16.5, 2)
  line L9 (16.5, 2) -> (16.5, 0)
  line L10 (16.5, 0) -> (4, 0)
  line L11 (4, 0) -> (4, 2)
  point P0 (13.5, 20.5)
extrude "Extrusion57" add sketch "Sketch74" along normal blind 20 contours L9 L7 L11 L0 | L3 L4 L5 L0
sketch "Sketch75" plane through (65, -18.5, 3) normal (0, 1, 0) x (1, 0, 0)
  line L0 (-56, 16.5) -> (-56, 66) projected
  line L1 (0, 0) -> (-56, 0) projected
  line L2 (-56, 66) -> (-54, 66)
  line L3 (-54, 66) -> (-54, 0)
  line L4 (-54, 0) -> (-56, 0)
  line L5 (-56, 0) -> (-56, 66)
  point P0 (-65, 3)
  point P1 (-56, 0)
  dimension "d145" = 2
extrude "Extrusion58" add sketch "Sketch75" along normal blind 2
sketch "Sketch76" plane through (82, 0, 0) normal (1, 0, 0) x (0, 0, -1)
  point P0 (0, 0)
sketch "Sketch77" plane through (82, 0, 0) normal (1, 0, 0) x (0, 0, -1)
  line L0 (2.0812, -18.5) -> (2.0812, -20.5) projected
  line L1 (2.0812, -20.5) -> (25.0812, -20.5) projected
  line L2 (2.0812, -18.5) -> (25.0812, -18.5)
  line L3 (25.0812, -18.5) -> (25.0812, -20.5)
  line L4 (25.0812, -20.5) -> (2.0812, -20.5)
  line L5 (2.0812, -20.5) -> (2.0812, -18.5)
  point P0 (0, 0)
extrude "Extrusion59" cut sketch "Sketch77" against normal blind 2
sketch "Sketch78" plane through (65, -16.5, 3) normal (0, 1, 0) x (1, 0, 0)
  line L0 (-56, 12.5) -> (-56, 0) projected
  line L1 (-56, 66) -> (2, 66) projected
  line L2 (-56, 0) -> (-53.9374, 0)
  line L3 (-53.9374, 0) -> (-53.9374, 66)
  line L4 (-53.9374, 66) -> (-56, 66)
  line L5 (-56, 66) -> (-56, 0)
  point P0 (-65, 3)
  point P1 (-56, 12.5)
extrude "Extrusion60" add sketch "Sketch78" along normal blind 3
sketch "Sketch79" plane through (68, -18.5, -2.0812) normal (0, 1, 0) x (1, 0, 0)
  line L0 (14, -5.0812) -> (-1, -5.0812) projected
  line L1 (-1, 30.9188) -> (14, 30.9188) projected
  line L2 (14, -5.0812) -> (-0.0009, -5.0812)
  line L3 (-0.0009, -5.0812) -> (-0.0009, 30.9188)
  line L4 (-0.0009, 30.9188) -> (14, 30.9188)
  line L5 (14, 30.9188) -> (14, -5.0812)
  point P0 (-68, -2.0812)
extrude "Extrusion61" cut sketch "Sketch79" against normal blind 3
sketch "Sketch80" plane through (67.9991, -18.5, 3) normal (1, 0, 0) x (0, 0, -1)
  line L0 (0, 0) -> (0, 2) projected
  line L1 (36, -2) -> (66, -2) projected
  line L2 (0, 0) -> (36, 0)
  line L3 (36, 0) -> (36, -2)
  line L4 (36, -2) -> (0, -2)
  line L5 (0, -2) -> (0, 0)
  point P0 (3, 18.5)
extrude "Extrusion62" add sketch "Sketch80" along normal blind 5
sketch "Sketch81" plane through (67, -18.5, 3) normal (0, 1, 0) x (1, 0, 0)
  point P0 (-67, 3)
sketch "Sketch82" plane through (29, 50, 3) normal (0, 0, 1) x (1, 0, 0)
  line L0 (38, -70.5) -> (43.9991, -70.5) projected
  line L1 (38, -68.5) -> (43.9991, -68.5) projected
  line L2 (43.9991, -70.5) -> (40.9991, -70.5)
  line L3 (40.9991, -70.5) -> (40.9991, -68.5)
  line L4 (40.9991, -68.5) -> (43.9991, -68.5)
  line L5 (43.9991, -68.5) -> (43.9991, -70.5)
  point P0 (-29, -50)
  dimension "d156" = 3
extrude "Extrusion63" add sketch "Sketch82" along normal blind 10
sketch "Sketch83" plane through (72.9991, -18.5, 3) normal (1, 0, 0) x (0, 0, -1)
  line L0 (36, 0) -> (-10, 0) projected
  line L1 (36, -2) -> (-10, -2) projected
  line L2 (-10, 0) -> (-5, 0)
  line L3 (-5, 0) -> (-5, -2)
  line L4 (-5, -2) -> (-10, -2)
  line L5 (-10, -2) -> (-10, 0)
  point P0 (3, 18.5)
  point P1 (-5, 0)
  dimension "d159" = 5
extrude "Extrusion64" add sketch "Sketch83" along normal blind 15.5
sketch "Sketch84" plane through (72.9991, -20.5, 8) normal (0, 0, -1) x (-1, 0, 0)
  line L0 (3, 2) -> (-15.5, 2) projected
  line L1 (0, 0) -> (-15.5, 0) projected
  line L2 (-15.5, 2) -> (-12.5, 2)
  line L3 (-12.5, 2) -> (-12.5, 0)
  line L4 (-12.5, 0) -> (-15.5, 0)
  line L5 (-15.5, 0) -> (-15.5, 2)
  point P0 (72.9991, 20.5)
  point P1 (-12.5, 2)
  dimension "d162" = 3
extrude "Extrusion65" add sketch "Sketch84" along normal blind 26
sketch "Sketch85" plane through (85.4991, -20.5, 8) normal (-1, 0, 0) x (0, 0, 1)
  line L0 (-26, 2) -> (-26, 0) projected
  line L1 (-41, 0) -> (0, 0) projected
  line L2 (-26, 2) -> (-23, 2)
  line L3 (-23, 2) -> (-23, 0)
  line L4 (-23, 0) -> (-26, 0)
  line L5 (-26, 0) -> (-26, 2)
  point P0 (-8, 20.5)
  dimension "d165" = 3
extrude "Extrusion66" add sketch "Sketch85" along normal up to surface (12.5 mm away)
sketch "Sketch86" plane through (72.9991, -20.5, -18) normal (0, 0, -1) x (-1, 0, 0)
  line L0 (-15.5, 2) -> (-15.5, 0) projected
  line L1 (63.9991, 0) -> (5.9991, 0) projected
  line L2 (-15.5, 2) -> (5.9991, 2)
  line L3 (5.9991, 2) -> (5.9991, 0)
  line L4 (5.9991, 0) -> (-15.5, 0)
  line L5 (-15.5, 0) -> (-15.5, 2)
  point P0 (72.9991, 20.5)
extrude "Extrusion67" add sketch "Sketch86" along normal blind 10
sketch "Sketch87" plane through (67, -18.5, 3) normal (0, 1, 0) x (1, 0, 0)
  line L0 (5.9991, -5) -> (18.4991, -5) projected
  line L1 (18.4991, 18) -> (5.9991, 18) projected
  circle A0 centre (12.2491, -7) radius 1
  circle A1 centre (12.2491, 20) radius 1
  point P0 (-67, 3)
  point P1 (12.2491, -5)
  point P2 (12.2491, 18)
  dimension "d170" = 2
  dimension "d171" = 2
extrude "Extrusion68" cut sketch "Sketch87" against normal blind 10
thread "Thread3" size "M2x0.4" class "6H" standard "ANSI Metric M Profile" full length
thread "Thread4" size "M2x0.4" class "6H" standard "ANSI Metric M Profile" full length
sketch "Sketch88" plane through (2, 0, -33) normal (0, 0, -1) x (-1, 0, 0)
  line L0 (-70.9991, -18.5) -> (-70.9991, -20.5) projected
  line L1 (-65, -20.5) -> (-70.9991, -20.5) projected
  line L2 (-70.9991, -18.5) -> (-65, -18.5)
  line L3 (-65, -18.5) -> (-65, -20.5)
  line L4 (-65, -20.5) -> (-70.9991, -20.5)
  line L5 (-70.9991, -20.5) -> (-70.9991, -18.5)
  point P0 (2, 0)
extrude "Extrusion69" cut sketch "Sketch88" against normal up to surface (5 mm away)
properties part number "btholder"
